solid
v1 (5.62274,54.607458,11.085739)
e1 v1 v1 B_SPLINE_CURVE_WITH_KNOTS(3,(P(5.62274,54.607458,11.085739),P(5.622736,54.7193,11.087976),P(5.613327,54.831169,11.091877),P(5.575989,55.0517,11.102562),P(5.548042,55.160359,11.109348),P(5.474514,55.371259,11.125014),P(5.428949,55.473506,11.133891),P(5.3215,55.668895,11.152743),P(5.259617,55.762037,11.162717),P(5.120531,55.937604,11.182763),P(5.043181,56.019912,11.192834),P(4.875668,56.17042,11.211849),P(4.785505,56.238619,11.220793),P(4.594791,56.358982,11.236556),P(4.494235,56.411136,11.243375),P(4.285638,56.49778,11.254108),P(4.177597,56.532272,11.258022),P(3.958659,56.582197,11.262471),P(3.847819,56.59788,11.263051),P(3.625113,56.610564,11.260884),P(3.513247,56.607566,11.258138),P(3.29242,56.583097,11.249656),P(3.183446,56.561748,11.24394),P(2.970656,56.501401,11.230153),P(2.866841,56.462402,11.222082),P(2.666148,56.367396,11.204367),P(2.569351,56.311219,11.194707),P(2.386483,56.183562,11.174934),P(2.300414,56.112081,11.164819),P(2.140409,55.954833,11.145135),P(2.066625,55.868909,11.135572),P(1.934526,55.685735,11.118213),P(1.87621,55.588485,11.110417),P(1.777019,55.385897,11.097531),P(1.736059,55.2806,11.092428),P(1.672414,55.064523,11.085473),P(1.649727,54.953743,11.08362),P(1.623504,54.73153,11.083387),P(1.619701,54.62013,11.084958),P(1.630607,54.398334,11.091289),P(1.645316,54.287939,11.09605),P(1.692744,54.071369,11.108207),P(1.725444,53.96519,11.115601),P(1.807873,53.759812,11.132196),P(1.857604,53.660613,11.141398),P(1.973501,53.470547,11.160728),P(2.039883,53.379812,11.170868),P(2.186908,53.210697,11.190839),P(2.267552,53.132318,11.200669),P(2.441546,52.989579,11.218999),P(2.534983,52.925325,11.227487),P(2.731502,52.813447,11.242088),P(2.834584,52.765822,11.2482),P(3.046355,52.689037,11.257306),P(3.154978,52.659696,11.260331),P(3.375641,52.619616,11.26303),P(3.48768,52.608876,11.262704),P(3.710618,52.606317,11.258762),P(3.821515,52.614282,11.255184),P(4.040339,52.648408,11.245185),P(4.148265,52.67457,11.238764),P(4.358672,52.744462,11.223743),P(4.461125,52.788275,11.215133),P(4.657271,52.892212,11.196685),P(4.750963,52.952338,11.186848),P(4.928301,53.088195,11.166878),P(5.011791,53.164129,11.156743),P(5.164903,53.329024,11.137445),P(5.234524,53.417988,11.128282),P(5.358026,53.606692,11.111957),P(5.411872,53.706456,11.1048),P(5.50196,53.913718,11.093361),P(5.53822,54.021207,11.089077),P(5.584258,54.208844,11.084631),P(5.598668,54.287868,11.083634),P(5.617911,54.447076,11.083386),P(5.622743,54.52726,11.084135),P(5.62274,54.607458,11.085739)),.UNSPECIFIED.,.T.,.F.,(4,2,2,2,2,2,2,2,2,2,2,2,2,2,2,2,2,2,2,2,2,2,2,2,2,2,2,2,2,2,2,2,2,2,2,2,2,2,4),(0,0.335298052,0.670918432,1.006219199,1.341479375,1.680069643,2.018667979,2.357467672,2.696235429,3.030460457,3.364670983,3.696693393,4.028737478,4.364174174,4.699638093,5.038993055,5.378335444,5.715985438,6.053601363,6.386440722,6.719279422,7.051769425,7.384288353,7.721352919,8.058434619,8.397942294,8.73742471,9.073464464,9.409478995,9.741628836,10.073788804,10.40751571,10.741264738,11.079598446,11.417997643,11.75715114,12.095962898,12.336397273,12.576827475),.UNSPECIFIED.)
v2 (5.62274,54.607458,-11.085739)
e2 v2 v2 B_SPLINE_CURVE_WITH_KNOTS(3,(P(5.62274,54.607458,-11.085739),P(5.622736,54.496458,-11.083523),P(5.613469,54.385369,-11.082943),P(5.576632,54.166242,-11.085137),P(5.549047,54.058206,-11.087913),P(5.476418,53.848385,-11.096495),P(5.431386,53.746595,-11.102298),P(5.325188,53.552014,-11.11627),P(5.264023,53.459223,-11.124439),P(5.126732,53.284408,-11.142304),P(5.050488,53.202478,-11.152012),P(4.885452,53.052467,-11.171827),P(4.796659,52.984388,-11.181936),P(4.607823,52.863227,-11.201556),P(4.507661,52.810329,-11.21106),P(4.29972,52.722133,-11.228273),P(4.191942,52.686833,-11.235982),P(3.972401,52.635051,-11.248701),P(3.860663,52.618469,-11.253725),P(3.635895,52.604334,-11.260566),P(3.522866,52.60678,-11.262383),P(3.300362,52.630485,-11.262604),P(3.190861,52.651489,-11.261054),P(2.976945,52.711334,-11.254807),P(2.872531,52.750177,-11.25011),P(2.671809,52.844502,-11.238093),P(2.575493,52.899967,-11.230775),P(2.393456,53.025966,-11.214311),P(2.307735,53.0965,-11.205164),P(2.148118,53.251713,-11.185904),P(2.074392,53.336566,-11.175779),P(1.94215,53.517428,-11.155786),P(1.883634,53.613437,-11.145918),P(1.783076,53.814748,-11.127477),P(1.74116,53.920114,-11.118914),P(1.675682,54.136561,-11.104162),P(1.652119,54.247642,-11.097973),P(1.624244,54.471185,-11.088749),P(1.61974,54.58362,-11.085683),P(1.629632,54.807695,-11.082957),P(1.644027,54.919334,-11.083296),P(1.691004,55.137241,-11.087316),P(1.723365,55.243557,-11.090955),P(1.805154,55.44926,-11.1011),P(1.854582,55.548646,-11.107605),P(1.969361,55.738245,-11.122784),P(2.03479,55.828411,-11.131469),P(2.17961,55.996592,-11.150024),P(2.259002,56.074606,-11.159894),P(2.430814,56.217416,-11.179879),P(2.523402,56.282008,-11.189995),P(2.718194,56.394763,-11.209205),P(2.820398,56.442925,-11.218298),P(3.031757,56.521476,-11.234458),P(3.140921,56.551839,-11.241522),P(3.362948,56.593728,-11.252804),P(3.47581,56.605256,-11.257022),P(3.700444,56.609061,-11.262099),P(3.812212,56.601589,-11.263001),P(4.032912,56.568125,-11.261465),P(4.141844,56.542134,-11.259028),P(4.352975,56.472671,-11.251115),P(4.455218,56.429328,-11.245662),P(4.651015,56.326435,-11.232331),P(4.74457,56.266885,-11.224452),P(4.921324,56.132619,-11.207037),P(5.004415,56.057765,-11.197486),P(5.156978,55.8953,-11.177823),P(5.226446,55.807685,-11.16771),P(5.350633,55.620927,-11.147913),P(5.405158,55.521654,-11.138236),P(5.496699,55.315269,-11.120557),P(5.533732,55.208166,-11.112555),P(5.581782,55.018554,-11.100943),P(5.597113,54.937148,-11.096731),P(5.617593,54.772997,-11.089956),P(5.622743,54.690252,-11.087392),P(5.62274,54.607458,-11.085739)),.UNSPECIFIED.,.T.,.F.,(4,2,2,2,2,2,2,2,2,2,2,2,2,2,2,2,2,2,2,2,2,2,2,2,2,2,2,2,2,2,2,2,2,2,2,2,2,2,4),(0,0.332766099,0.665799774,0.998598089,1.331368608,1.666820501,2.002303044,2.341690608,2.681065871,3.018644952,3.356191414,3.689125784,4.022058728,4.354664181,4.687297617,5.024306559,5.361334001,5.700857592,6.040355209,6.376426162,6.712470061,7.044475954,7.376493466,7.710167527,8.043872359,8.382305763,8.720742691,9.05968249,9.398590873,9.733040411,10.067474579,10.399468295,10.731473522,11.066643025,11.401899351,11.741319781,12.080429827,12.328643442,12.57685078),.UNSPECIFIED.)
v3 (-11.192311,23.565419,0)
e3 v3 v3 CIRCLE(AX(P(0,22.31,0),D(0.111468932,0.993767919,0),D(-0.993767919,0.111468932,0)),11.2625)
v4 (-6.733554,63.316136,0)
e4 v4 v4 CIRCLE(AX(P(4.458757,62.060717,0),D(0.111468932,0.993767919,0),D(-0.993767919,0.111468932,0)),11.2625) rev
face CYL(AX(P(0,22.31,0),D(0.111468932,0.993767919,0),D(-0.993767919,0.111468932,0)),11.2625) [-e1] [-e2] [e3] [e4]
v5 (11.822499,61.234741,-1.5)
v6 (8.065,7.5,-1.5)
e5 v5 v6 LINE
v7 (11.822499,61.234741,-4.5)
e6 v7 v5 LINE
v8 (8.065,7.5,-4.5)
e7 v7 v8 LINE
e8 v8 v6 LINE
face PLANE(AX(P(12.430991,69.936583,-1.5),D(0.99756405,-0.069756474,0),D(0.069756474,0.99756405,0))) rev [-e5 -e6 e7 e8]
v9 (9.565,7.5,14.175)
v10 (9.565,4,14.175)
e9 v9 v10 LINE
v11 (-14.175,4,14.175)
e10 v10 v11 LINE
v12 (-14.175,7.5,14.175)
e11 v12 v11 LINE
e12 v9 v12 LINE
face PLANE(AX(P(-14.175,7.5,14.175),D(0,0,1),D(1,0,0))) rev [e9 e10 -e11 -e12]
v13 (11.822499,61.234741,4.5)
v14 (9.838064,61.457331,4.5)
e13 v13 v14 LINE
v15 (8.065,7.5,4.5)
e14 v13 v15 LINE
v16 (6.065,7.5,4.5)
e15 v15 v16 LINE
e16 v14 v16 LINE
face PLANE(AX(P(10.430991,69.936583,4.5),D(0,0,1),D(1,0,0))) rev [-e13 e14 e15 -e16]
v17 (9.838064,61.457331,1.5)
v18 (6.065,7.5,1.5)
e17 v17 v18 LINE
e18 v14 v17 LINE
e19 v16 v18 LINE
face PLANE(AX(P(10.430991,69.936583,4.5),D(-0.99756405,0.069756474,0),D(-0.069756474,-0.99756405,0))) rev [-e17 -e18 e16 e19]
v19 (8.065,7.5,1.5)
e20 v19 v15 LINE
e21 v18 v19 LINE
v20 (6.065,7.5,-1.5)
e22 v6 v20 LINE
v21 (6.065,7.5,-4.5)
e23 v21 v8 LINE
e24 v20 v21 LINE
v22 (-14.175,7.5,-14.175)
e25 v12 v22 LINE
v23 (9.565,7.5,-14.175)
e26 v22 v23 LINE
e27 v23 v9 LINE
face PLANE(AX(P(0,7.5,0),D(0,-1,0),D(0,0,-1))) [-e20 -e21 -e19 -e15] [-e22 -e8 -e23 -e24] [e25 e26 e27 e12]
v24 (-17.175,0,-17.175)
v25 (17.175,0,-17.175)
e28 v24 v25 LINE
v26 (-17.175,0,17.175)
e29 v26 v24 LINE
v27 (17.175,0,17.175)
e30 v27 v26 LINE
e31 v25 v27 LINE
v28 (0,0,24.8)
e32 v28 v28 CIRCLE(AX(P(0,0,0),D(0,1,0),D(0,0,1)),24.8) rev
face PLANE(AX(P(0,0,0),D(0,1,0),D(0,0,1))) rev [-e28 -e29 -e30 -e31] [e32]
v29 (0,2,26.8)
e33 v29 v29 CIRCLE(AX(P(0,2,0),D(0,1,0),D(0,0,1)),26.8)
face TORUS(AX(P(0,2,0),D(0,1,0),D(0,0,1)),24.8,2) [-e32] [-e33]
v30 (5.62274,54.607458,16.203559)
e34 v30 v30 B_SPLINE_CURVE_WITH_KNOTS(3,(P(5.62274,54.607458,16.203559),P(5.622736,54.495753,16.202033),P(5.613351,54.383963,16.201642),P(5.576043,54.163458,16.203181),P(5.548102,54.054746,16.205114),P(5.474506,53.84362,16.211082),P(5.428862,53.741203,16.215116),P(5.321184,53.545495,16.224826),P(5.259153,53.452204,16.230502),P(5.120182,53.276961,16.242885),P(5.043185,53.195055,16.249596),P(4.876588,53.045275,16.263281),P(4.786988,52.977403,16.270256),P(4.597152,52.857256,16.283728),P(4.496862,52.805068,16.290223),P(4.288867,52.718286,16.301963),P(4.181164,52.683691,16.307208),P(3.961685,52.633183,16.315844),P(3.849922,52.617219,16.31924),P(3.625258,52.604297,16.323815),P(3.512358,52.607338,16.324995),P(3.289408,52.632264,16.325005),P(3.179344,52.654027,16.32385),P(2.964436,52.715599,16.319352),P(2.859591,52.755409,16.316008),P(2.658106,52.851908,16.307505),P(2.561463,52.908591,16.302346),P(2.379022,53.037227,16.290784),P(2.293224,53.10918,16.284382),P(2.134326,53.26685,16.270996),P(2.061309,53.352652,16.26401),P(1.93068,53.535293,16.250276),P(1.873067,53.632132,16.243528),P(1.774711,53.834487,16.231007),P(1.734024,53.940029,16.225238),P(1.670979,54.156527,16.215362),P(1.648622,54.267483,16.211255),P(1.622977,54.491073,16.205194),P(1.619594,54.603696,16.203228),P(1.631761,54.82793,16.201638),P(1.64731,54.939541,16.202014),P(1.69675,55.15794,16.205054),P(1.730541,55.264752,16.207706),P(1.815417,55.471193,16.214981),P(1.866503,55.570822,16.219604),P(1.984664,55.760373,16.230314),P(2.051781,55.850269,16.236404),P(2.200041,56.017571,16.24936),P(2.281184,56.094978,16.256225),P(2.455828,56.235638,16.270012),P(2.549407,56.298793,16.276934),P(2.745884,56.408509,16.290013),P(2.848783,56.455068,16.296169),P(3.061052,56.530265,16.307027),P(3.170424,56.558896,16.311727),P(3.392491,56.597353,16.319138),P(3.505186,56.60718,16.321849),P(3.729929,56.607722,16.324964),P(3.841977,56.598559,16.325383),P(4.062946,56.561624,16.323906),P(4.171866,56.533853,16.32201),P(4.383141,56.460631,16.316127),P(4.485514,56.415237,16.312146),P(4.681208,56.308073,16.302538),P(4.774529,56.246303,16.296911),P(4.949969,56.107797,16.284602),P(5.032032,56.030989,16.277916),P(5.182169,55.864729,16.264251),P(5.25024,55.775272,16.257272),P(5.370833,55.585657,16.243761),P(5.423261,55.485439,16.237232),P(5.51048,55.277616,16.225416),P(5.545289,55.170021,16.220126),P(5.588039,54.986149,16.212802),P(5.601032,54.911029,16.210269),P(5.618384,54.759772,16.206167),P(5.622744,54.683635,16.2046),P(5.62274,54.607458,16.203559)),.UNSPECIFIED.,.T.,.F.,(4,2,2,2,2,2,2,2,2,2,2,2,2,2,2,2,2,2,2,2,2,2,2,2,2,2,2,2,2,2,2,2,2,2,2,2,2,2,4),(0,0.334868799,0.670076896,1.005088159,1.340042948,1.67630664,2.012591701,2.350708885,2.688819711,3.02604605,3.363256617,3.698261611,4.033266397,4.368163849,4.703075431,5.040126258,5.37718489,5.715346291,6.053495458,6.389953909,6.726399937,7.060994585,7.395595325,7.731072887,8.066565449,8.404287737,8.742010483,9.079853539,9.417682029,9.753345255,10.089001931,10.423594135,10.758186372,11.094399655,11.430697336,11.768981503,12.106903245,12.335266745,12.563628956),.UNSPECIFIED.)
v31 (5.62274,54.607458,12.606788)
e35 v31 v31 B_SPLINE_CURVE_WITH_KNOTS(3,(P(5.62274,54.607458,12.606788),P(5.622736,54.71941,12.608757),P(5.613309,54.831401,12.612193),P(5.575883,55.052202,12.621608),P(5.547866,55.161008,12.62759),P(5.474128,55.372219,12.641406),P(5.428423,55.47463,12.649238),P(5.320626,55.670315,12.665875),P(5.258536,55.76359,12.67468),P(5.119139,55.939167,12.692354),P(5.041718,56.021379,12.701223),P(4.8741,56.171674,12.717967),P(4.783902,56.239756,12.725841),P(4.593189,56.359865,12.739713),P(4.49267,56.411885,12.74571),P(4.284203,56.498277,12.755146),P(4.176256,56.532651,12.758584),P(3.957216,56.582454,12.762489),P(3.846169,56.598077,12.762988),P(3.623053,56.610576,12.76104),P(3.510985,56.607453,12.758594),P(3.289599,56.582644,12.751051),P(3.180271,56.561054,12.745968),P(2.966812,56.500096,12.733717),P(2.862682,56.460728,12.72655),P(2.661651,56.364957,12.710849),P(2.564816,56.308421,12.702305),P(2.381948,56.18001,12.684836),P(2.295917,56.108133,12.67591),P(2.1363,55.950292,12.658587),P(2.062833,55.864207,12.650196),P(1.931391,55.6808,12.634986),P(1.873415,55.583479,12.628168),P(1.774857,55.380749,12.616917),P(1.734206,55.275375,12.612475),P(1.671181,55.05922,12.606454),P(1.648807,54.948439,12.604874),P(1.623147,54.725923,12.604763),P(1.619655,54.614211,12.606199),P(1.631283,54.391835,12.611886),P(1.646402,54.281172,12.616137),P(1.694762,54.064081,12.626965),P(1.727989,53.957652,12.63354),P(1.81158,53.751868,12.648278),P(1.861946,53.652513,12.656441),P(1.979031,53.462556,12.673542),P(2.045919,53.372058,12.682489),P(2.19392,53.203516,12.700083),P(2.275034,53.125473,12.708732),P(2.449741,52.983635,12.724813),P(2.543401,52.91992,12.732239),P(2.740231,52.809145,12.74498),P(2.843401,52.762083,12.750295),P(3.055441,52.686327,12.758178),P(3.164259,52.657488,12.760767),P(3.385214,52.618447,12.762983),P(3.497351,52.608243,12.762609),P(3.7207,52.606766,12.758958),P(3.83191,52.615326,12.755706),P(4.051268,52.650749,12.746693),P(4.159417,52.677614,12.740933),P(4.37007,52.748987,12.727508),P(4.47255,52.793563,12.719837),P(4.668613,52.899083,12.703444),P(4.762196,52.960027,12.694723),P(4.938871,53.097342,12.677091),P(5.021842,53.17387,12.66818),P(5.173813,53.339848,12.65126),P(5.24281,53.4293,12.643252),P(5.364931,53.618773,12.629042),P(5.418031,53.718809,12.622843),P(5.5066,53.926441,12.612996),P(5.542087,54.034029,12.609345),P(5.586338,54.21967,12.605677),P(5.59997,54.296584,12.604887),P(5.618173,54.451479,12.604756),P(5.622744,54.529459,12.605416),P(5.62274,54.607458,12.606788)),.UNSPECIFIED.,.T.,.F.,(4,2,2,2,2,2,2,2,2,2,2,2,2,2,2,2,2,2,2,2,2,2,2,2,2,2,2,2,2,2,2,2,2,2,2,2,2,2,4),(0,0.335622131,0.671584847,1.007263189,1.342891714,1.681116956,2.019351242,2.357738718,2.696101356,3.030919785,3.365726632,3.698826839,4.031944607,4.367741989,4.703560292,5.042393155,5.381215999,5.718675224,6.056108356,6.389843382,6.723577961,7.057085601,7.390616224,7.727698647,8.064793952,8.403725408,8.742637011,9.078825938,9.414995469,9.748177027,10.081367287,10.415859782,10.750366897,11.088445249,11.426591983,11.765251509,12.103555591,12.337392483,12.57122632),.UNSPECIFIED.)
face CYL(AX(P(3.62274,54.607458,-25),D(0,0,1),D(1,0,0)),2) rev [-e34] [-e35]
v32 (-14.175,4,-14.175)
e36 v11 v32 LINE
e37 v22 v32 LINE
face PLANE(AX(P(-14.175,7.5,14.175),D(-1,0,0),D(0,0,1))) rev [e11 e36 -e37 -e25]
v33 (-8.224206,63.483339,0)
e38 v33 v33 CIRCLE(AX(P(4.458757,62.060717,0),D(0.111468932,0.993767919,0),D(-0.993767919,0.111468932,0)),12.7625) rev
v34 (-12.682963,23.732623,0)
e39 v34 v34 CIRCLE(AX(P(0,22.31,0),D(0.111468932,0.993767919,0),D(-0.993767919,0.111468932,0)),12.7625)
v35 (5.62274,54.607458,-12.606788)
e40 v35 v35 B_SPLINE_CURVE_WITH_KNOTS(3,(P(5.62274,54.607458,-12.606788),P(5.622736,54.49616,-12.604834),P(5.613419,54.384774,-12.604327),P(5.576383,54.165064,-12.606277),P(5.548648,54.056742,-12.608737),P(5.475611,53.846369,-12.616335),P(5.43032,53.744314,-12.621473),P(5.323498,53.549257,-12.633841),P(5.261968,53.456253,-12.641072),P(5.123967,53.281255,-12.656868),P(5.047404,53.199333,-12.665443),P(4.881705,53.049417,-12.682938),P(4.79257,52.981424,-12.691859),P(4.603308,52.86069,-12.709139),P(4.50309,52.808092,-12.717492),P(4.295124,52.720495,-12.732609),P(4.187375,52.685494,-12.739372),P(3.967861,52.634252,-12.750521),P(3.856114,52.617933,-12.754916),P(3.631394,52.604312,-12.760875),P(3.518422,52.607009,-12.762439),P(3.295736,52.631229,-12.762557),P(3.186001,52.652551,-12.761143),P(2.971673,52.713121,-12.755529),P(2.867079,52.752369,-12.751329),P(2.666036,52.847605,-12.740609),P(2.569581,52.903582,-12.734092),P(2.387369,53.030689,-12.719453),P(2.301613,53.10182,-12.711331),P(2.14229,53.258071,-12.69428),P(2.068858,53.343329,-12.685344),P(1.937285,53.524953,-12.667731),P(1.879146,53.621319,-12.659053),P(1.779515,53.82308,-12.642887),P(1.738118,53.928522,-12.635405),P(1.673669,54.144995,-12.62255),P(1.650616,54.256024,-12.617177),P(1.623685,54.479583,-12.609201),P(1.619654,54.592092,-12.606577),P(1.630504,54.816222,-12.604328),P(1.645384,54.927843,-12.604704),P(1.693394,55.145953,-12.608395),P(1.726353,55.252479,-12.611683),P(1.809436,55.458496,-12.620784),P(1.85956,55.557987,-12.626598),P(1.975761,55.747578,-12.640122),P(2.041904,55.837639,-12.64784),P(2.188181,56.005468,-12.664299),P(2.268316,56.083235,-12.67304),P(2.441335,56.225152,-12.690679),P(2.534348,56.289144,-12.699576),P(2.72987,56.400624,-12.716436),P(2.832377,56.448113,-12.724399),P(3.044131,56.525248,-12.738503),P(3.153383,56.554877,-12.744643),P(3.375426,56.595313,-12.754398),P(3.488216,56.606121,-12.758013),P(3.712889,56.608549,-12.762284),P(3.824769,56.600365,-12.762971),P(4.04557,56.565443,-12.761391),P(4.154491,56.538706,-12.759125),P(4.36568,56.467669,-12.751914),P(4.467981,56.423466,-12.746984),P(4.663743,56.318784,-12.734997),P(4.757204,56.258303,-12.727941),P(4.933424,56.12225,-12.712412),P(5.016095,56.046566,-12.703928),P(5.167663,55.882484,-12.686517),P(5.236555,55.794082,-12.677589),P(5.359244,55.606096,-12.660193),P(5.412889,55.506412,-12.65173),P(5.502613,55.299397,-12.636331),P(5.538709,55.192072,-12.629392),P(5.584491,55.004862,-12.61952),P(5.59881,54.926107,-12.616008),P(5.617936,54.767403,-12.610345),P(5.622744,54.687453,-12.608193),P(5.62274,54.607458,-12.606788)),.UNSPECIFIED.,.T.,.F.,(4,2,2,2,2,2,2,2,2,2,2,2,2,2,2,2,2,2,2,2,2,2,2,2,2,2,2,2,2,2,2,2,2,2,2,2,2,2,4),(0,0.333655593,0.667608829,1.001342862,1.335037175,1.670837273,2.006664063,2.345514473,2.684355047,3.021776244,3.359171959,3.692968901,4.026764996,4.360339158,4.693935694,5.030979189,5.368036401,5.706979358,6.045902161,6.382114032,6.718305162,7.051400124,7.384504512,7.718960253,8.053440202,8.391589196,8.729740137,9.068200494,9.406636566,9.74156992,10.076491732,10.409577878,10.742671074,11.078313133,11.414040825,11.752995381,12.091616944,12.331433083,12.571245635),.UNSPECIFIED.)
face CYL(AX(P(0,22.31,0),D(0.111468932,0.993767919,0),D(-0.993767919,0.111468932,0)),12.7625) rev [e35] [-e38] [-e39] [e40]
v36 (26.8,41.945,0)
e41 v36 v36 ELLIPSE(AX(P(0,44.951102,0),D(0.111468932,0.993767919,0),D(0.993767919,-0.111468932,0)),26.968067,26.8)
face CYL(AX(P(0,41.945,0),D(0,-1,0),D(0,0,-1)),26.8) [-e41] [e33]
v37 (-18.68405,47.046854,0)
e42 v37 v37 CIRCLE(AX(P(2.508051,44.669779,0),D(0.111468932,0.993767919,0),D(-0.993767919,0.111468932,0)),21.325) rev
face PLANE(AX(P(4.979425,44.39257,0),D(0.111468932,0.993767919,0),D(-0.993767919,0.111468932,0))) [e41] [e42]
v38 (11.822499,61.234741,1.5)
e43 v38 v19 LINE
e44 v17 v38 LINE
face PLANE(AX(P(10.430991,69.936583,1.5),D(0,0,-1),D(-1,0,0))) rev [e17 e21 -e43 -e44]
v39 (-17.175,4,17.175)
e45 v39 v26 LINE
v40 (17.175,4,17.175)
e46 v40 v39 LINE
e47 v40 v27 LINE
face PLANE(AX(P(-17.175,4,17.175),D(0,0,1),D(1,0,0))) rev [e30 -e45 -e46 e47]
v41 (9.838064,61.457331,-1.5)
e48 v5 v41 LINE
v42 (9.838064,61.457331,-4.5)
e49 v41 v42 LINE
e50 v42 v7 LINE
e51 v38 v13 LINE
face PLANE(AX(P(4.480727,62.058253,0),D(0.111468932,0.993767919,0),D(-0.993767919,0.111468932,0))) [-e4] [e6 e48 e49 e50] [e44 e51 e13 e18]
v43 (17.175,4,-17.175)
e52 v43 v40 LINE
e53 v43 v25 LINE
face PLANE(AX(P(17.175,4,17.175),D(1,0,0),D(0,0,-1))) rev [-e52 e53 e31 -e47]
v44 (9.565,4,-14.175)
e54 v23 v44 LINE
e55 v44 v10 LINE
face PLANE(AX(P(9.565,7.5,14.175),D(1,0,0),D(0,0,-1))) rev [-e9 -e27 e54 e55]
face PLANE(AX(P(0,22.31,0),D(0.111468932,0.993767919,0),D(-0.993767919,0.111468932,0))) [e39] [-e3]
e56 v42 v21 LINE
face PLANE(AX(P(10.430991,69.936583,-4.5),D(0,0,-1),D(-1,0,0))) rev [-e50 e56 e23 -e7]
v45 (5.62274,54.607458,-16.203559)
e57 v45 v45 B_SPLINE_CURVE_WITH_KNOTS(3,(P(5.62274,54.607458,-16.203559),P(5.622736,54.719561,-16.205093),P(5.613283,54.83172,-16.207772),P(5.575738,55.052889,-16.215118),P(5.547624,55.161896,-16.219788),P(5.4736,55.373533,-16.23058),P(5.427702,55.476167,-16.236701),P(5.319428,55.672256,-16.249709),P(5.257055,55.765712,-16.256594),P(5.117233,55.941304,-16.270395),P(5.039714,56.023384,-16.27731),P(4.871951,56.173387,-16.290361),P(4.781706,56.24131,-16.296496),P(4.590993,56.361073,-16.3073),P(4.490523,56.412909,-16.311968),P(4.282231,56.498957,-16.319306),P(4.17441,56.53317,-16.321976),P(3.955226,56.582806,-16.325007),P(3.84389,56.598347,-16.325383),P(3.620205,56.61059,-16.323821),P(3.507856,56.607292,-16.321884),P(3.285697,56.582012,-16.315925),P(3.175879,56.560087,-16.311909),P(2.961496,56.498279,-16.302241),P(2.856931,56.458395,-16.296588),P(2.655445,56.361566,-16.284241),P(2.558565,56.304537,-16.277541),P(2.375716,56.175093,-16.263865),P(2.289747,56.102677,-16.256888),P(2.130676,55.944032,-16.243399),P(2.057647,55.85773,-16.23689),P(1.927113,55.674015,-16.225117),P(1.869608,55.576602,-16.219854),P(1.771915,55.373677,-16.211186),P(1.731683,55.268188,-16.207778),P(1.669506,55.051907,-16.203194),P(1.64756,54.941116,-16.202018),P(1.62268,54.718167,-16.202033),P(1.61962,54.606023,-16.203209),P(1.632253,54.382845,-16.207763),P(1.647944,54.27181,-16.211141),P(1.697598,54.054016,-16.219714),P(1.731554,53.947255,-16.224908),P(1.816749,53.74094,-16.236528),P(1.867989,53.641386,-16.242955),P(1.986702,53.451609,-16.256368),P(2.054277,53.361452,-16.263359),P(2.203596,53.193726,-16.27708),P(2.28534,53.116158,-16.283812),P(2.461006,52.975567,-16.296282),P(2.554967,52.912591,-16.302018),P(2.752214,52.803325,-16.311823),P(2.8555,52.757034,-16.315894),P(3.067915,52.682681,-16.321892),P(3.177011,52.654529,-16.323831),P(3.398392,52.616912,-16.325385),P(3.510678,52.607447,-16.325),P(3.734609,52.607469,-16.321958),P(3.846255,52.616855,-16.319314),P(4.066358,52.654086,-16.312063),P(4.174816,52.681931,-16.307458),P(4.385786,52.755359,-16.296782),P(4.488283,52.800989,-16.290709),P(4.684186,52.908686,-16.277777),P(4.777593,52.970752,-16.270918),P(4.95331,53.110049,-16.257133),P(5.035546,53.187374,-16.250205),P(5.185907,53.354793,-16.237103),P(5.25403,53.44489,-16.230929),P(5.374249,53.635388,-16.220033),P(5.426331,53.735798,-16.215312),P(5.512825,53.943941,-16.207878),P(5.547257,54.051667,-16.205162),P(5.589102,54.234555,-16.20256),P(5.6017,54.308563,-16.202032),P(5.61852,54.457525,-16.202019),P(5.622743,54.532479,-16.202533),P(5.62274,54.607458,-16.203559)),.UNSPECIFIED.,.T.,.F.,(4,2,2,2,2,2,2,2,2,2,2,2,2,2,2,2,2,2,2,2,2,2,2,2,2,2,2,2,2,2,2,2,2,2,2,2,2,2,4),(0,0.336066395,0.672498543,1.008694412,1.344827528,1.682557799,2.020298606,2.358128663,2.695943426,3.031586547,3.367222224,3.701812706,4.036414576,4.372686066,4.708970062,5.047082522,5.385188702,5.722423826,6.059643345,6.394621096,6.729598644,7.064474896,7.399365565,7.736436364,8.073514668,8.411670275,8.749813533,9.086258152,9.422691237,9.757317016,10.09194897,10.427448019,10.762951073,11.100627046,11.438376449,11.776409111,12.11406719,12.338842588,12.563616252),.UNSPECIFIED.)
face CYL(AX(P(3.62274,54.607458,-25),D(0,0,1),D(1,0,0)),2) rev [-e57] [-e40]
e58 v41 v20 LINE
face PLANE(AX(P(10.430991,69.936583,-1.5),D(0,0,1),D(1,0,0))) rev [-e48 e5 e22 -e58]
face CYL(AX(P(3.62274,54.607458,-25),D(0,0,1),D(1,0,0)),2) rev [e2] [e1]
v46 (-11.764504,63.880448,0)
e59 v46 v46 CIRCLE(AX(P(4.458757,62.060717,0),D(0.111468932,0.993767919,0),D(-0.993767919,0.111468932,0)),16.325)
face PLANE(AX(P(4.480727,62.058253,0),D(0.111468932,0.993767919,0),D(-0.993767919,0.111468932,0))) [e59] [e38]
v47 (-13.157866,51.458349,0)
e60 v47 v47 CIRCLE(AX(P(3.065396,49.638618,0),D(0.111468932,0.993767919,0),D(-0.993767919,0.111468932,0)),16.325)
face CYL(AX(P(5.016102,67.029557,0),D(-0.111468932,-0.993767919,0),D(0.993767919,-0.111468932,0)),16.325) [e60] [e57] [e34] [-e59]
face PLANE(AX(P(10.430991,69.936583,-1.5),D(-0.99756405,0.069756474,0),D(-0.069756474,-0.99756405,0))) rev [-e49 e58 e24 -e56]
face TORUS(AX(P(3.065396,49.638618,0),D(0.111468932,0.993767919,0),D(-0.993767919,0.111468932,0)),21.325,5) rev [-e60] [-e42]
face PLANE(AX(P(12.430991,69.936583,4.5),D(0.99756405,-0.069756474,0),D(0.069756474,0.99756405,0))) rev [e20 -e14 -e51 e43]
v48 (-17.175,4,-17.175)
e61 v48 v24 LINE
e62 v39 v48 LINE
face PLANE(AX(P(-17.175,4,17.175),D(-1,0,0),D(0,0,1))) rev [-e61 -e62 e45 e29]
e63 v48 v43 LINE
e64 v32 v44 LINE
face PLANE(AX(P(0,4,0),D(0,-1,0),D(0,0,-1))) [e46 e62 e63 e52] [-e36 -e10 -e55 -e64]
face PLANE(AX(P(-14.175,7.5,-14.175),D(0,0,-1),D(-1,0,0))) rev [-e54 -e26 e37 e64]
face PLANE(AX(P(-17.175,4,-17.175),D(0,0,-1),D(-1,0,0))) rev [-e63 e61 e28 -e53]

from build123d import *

# Parameters (mm, degrees)
SKETCH1_R                  = 26.8
MAIN_BODY_EXTRUDE_DEPTH    = 41.945
ANGLED_EXTRUDE_OUTLINE_R   = 26.8
ANGLED_EXTRUDE_DEPTH       = 6.012203303
ANGLED_START               = 44.670962752
ANGLED_EXTRUDE_2_OUTLINE_W = 56
ANGLED_EXTRUDE_2_OUTLINE_H = 56
ANGLED_EXTRUDE_2_DEPTH     = 7.329037248
SKETCH8_R                  = 16.325
ATTACHMENT_EXTRUDE_DEPTH   = 22.5
SKETCH11_R                 = 12.7625
SKETCH11_R_2               = 11.2625
TUBING_HOLE_DEPTH          = 45
SKETCH13_R                 = 2
BOLT_HOLE_DEPTH            = 25
SKETCH14_W                 = 34.35
SKETCH14_H                 = 34.35
CUT_EXTRUDE3_DEPTH         = 4
CUT_EXTRUDE4_DEPTH         = 2
SKETCH16_W                 = 23.74
SKETCH16_H                 = 28.35
CUT_EXTRUDE5_DEPTH         = 3.5
CUT_EXTRUDE12_REACH        = 74.294
SKETCH36_W                 = 2
SKETCH36_H                 = 3
FILLET3_R                  = 5
SKETCH32_R                 = 17.343535691
CUT_EXTRUDE10_DEPTH        = 5


with BuildPart() as part:
    # Sketch1 → Main Body Extrude (new body)
    with BuildSketch(Plane(origin=(0, 0, 0), x_dir=(1, 0, 0), z_dir=(0, 1, 0))):
        with Locations(Location((0, 0, 0), (0, 0, 270))):
            Circle(SKETCH1_R)
    extrude(amount=MAIN_BODY_EXTRUDE_DEPTH)

    # Angled Extrude: read off the stored shape, not the designer's step
    # Angled Extrude outline → Angled Extrude (add)
    with BuildSketch(Plane(origin=(0, 41.945, 0), x_dir=(1, 0, 0), z_dir=(0, 1, 0))):
        Circle(ANGLED_EXTRUDE_OUTLINE_R)
    extrude(amount=ANGLED_EXTRUDE_DEPTH)

    # Angled Extrude 2 outline → Angled Extrude 2 (cut)
    with BuildSketch(Plane(origin=(0, 0, 0), x_dir=(0.9937679191605965, -0.11146893220632507, 0), z_dir=(0.11146893220632506, 0.9937679191605965, 0)).offset(ANGLED_START)):
        with Locations((-5, 0)):
            Rectangle(ANGLED_EXTRUDE_2_OUTLINE_W, ANGLED_EXTRUDE_2_OUTLINE_H)
    extrude(amount=ANGLED_EXTRUDE_2_DEPTH, mode=Mode.SUBTRACT)

    # Sketch8 → Attachment Extrude (add)
    with BuildSketch(Plane(origin=(4.979424519, 44.392569701, 0), x_dir=(0.9937679191605964, -0.11146893220632542, 0), z_dir=(0.11146893220632542, 0.9937679191605964, 0))):
        with Locations(Location((-2.486871931, 0, 0), (0, 0, 180))):
            Circle(SKETCH8_R)
    extrude(amount=ATTACHMENT_EXTRUDE_DEPTH)

    # Sketch11 → Tubing Hole (cut)
    with BuildSketch(Plane(origin=(7.487475493, 66.752347882, 0), x_dir=(0.9937679191605964, -0.11146893220632542, 0), z_dir=(0.11146893220632542, 0.9937679191605964, 0))):
        with Locations(Location((-2.486871931, 0, 0), (0, 0, 180))):
            Circle(SKETCH11_R)
        with Locations(Location((-2.486871931, 0, 0), (0, 0, 180))):
            Circle(SKETCH11_R_2, mode=Mode.SUBTRACT)
    extrude(amount=-TUBING_HOLE_DEPTH, mode=Mode.SUBTRACT)

    # Sketch13 → Bolt Hole (cut, symmetric)
    with BuildSketch(Plane.XY):
        with Locations((3.622740297, 54.607457852)):
            Circle(SKETCH13_R)
    extrude(amount=BOLT_HOLE_DEPTH, both=True, mode=Mode.SUBTRACT)

    # Sketch14 → Cut-Extrude3 (cut)
    with BuildSketch(Plane.XZ):
        Rectangle(SKETCH14_W, SKETCH14_H)
    extrude(amount=-CUT_EXTRUDE3_DEPTH, mode=Mode.SUBTRACT)

    # Sketch15 → Cut-Extrude4 (cut)
    with BuildSketch(Plane.XZ.offset(-4)):
        with BuildLine():
            ThreePointArc((-6.675, -12.175), (-5.175, -13.675), (-3.675, -12.175))
            Line((-3.675, -12.175), (-6.675, -12.175))
        make_face()
        with BuildLine():
            Line((-6.675, -12.175), (-3.675, -12.175))
            ThreePointArc((-3.675, -12.175), (-5.175, -10.675), (-6.675, -12.175))
        make_face()
        with BuildLine():
            ThreePointArc((-10.675, 0), (-11.114339828, 1.060660172), (-12.175, 1.5))
            Line((-12.175, 1.5), (-12.175, -1.5))
            ThreePointArc((-12.175, -1.5), (-11.114339828, -1.060660172), (-10.675, 0))
        make_face()
        with BuildLine():
            Line((-12.175, -1.5), (-12.175, 1.5))
            ThreePointArc((-12.175, 1.5), (-13.675, 0), (-12.175, -1.5))
        make_face()
        with BuildLine():
            ThreePointArc((-6.675, 12.175), (-5.175, 10.675), (-3.675, 12.175))
            Line((-3.675, 12.175), (-6.675, 12.175))
        make_face()
        with BuildLine():
            Line((-6.675, 12.175), (-3.675, 12.175))
            ThreePointArc((-3.675, 12.175), (-5.175, 13.675), (-6.675, 12.175))
        make_face()
    extrude(amount=-CUT_EXTRUDE4_DEPTH, mode=Mode.SUBTRACT)

    # Sketch16 → Cut-Extrude5 (cut)
    with BuildSketch(Plane.XZ.offset(-4)):
        with Locations((-2.305, 0)):
            Rectangle(SKETCH16_W, SKETCH16_H)
    extrude(amount=-CUT_EXTRUDE5_DEPTH, mode=Mode.SUBTRACT)

    # Fillet1: read off the stored shape, not the designer's step
    # Fillet1 outline → Fillet1 (revolve, cut)
    with BuildSketch(Plane.XY):
        with BuildLine():
            ThreePointArc((26.8, 2), (26.214213562, 0.585786438), (24.8, 0))
            Line((24.8, 0), (26.8, 0))
            Line((26.8, 0), (26.8, 2))
        make_face()
    revolve(axis=Axis((0, 0, 0), (0, 1, 0)), mode=Mode.SUBTRACT)

    # Cut-Extrude12: up to this plane
    cut_extrude12_end = Plane(origin=(5.016101949, 67.029556841, 0), z_dir=(0.11146893220632542, 0.9937679191605964, 0))
    # Sketch36 → Cut-Extrude12 (cut, up to the surface)
    with BuildSketch(Plane.XZ.offset(-7.5), mode=Mode.PRIVATE) as cut_extrude12_sk1:
        with Locations((7.065, 3)):
            Rectangle(SKETCH36_W, SKETCH36_H)
    cut_extrude12_tool1 = split(extrude(cut_extrude12_sk1.sketch, amount=CUT_EXTRUDE12_REACH, dir=(0.069756473744, 0.99756405026, 0), mode=Mode.PRIVATE), bisect_by=cut_extrude12_end, keep=Keep.BOTH, mode=Mode.PRIVATE)
    add(cut_extrude12_tool1.solids().sort_by_distance((7.065, 7.5, 3))[0], mode=Mode.SUBTRACT)
    # Sketch36 → Cut-Extrude12 (cut, up to the surface)
    with BuildSketch(Plane.XZ.offset(-7.5), mode=Mode.PRIVATE) as cut_extrude12_sk2:
        with Locations((7.065, -3)):
            Rectangle(SKETCH36_W, SKETCH36_H)
    cut_extrude12_tool2 = split(extrude(cut_extrude12_sk2.sketch, amount=CUT_EXTRUDE12_REACH, dir=(0.069756473744, 0.99756405026, 0), mode=Mode.PRIVATE), bisect_by=cut_extrude12_end, keep=Keep.BOTH, mode=Mode.PRIVATE)
    add(cut_extrude12_tool2.solids().sort_by_distance((7.065, 7.5, -3))[0], mode=Mode.SUBTRACT)

    # Fillet3
    fillet3_edges = [part.edges().sort_by_distance(p)[0] for p in [
        (18.731312255, 42.850048342, 0),
    ]]
    fillet(fillet3_edges, radius=FILLET3_R)

    # Sketch32 → Cut-Extrude10 (cut)
    with BuildSketch(Plane(origin=(7.487475493, 66.752347882, 0), x_dir=(0.9937679191605965, -0.11146893220632544, 0), z_dir=(0.11146893220632544, 0.9937679191605965, 0))):
        with Locations((-2.464764356, 0)):
            Circle(SKETCH32_R)
    extrude(amount=-CUT_EXTRUDE10_DEPTH, mode=Mode.SUBTRACT)


solid = part.part
